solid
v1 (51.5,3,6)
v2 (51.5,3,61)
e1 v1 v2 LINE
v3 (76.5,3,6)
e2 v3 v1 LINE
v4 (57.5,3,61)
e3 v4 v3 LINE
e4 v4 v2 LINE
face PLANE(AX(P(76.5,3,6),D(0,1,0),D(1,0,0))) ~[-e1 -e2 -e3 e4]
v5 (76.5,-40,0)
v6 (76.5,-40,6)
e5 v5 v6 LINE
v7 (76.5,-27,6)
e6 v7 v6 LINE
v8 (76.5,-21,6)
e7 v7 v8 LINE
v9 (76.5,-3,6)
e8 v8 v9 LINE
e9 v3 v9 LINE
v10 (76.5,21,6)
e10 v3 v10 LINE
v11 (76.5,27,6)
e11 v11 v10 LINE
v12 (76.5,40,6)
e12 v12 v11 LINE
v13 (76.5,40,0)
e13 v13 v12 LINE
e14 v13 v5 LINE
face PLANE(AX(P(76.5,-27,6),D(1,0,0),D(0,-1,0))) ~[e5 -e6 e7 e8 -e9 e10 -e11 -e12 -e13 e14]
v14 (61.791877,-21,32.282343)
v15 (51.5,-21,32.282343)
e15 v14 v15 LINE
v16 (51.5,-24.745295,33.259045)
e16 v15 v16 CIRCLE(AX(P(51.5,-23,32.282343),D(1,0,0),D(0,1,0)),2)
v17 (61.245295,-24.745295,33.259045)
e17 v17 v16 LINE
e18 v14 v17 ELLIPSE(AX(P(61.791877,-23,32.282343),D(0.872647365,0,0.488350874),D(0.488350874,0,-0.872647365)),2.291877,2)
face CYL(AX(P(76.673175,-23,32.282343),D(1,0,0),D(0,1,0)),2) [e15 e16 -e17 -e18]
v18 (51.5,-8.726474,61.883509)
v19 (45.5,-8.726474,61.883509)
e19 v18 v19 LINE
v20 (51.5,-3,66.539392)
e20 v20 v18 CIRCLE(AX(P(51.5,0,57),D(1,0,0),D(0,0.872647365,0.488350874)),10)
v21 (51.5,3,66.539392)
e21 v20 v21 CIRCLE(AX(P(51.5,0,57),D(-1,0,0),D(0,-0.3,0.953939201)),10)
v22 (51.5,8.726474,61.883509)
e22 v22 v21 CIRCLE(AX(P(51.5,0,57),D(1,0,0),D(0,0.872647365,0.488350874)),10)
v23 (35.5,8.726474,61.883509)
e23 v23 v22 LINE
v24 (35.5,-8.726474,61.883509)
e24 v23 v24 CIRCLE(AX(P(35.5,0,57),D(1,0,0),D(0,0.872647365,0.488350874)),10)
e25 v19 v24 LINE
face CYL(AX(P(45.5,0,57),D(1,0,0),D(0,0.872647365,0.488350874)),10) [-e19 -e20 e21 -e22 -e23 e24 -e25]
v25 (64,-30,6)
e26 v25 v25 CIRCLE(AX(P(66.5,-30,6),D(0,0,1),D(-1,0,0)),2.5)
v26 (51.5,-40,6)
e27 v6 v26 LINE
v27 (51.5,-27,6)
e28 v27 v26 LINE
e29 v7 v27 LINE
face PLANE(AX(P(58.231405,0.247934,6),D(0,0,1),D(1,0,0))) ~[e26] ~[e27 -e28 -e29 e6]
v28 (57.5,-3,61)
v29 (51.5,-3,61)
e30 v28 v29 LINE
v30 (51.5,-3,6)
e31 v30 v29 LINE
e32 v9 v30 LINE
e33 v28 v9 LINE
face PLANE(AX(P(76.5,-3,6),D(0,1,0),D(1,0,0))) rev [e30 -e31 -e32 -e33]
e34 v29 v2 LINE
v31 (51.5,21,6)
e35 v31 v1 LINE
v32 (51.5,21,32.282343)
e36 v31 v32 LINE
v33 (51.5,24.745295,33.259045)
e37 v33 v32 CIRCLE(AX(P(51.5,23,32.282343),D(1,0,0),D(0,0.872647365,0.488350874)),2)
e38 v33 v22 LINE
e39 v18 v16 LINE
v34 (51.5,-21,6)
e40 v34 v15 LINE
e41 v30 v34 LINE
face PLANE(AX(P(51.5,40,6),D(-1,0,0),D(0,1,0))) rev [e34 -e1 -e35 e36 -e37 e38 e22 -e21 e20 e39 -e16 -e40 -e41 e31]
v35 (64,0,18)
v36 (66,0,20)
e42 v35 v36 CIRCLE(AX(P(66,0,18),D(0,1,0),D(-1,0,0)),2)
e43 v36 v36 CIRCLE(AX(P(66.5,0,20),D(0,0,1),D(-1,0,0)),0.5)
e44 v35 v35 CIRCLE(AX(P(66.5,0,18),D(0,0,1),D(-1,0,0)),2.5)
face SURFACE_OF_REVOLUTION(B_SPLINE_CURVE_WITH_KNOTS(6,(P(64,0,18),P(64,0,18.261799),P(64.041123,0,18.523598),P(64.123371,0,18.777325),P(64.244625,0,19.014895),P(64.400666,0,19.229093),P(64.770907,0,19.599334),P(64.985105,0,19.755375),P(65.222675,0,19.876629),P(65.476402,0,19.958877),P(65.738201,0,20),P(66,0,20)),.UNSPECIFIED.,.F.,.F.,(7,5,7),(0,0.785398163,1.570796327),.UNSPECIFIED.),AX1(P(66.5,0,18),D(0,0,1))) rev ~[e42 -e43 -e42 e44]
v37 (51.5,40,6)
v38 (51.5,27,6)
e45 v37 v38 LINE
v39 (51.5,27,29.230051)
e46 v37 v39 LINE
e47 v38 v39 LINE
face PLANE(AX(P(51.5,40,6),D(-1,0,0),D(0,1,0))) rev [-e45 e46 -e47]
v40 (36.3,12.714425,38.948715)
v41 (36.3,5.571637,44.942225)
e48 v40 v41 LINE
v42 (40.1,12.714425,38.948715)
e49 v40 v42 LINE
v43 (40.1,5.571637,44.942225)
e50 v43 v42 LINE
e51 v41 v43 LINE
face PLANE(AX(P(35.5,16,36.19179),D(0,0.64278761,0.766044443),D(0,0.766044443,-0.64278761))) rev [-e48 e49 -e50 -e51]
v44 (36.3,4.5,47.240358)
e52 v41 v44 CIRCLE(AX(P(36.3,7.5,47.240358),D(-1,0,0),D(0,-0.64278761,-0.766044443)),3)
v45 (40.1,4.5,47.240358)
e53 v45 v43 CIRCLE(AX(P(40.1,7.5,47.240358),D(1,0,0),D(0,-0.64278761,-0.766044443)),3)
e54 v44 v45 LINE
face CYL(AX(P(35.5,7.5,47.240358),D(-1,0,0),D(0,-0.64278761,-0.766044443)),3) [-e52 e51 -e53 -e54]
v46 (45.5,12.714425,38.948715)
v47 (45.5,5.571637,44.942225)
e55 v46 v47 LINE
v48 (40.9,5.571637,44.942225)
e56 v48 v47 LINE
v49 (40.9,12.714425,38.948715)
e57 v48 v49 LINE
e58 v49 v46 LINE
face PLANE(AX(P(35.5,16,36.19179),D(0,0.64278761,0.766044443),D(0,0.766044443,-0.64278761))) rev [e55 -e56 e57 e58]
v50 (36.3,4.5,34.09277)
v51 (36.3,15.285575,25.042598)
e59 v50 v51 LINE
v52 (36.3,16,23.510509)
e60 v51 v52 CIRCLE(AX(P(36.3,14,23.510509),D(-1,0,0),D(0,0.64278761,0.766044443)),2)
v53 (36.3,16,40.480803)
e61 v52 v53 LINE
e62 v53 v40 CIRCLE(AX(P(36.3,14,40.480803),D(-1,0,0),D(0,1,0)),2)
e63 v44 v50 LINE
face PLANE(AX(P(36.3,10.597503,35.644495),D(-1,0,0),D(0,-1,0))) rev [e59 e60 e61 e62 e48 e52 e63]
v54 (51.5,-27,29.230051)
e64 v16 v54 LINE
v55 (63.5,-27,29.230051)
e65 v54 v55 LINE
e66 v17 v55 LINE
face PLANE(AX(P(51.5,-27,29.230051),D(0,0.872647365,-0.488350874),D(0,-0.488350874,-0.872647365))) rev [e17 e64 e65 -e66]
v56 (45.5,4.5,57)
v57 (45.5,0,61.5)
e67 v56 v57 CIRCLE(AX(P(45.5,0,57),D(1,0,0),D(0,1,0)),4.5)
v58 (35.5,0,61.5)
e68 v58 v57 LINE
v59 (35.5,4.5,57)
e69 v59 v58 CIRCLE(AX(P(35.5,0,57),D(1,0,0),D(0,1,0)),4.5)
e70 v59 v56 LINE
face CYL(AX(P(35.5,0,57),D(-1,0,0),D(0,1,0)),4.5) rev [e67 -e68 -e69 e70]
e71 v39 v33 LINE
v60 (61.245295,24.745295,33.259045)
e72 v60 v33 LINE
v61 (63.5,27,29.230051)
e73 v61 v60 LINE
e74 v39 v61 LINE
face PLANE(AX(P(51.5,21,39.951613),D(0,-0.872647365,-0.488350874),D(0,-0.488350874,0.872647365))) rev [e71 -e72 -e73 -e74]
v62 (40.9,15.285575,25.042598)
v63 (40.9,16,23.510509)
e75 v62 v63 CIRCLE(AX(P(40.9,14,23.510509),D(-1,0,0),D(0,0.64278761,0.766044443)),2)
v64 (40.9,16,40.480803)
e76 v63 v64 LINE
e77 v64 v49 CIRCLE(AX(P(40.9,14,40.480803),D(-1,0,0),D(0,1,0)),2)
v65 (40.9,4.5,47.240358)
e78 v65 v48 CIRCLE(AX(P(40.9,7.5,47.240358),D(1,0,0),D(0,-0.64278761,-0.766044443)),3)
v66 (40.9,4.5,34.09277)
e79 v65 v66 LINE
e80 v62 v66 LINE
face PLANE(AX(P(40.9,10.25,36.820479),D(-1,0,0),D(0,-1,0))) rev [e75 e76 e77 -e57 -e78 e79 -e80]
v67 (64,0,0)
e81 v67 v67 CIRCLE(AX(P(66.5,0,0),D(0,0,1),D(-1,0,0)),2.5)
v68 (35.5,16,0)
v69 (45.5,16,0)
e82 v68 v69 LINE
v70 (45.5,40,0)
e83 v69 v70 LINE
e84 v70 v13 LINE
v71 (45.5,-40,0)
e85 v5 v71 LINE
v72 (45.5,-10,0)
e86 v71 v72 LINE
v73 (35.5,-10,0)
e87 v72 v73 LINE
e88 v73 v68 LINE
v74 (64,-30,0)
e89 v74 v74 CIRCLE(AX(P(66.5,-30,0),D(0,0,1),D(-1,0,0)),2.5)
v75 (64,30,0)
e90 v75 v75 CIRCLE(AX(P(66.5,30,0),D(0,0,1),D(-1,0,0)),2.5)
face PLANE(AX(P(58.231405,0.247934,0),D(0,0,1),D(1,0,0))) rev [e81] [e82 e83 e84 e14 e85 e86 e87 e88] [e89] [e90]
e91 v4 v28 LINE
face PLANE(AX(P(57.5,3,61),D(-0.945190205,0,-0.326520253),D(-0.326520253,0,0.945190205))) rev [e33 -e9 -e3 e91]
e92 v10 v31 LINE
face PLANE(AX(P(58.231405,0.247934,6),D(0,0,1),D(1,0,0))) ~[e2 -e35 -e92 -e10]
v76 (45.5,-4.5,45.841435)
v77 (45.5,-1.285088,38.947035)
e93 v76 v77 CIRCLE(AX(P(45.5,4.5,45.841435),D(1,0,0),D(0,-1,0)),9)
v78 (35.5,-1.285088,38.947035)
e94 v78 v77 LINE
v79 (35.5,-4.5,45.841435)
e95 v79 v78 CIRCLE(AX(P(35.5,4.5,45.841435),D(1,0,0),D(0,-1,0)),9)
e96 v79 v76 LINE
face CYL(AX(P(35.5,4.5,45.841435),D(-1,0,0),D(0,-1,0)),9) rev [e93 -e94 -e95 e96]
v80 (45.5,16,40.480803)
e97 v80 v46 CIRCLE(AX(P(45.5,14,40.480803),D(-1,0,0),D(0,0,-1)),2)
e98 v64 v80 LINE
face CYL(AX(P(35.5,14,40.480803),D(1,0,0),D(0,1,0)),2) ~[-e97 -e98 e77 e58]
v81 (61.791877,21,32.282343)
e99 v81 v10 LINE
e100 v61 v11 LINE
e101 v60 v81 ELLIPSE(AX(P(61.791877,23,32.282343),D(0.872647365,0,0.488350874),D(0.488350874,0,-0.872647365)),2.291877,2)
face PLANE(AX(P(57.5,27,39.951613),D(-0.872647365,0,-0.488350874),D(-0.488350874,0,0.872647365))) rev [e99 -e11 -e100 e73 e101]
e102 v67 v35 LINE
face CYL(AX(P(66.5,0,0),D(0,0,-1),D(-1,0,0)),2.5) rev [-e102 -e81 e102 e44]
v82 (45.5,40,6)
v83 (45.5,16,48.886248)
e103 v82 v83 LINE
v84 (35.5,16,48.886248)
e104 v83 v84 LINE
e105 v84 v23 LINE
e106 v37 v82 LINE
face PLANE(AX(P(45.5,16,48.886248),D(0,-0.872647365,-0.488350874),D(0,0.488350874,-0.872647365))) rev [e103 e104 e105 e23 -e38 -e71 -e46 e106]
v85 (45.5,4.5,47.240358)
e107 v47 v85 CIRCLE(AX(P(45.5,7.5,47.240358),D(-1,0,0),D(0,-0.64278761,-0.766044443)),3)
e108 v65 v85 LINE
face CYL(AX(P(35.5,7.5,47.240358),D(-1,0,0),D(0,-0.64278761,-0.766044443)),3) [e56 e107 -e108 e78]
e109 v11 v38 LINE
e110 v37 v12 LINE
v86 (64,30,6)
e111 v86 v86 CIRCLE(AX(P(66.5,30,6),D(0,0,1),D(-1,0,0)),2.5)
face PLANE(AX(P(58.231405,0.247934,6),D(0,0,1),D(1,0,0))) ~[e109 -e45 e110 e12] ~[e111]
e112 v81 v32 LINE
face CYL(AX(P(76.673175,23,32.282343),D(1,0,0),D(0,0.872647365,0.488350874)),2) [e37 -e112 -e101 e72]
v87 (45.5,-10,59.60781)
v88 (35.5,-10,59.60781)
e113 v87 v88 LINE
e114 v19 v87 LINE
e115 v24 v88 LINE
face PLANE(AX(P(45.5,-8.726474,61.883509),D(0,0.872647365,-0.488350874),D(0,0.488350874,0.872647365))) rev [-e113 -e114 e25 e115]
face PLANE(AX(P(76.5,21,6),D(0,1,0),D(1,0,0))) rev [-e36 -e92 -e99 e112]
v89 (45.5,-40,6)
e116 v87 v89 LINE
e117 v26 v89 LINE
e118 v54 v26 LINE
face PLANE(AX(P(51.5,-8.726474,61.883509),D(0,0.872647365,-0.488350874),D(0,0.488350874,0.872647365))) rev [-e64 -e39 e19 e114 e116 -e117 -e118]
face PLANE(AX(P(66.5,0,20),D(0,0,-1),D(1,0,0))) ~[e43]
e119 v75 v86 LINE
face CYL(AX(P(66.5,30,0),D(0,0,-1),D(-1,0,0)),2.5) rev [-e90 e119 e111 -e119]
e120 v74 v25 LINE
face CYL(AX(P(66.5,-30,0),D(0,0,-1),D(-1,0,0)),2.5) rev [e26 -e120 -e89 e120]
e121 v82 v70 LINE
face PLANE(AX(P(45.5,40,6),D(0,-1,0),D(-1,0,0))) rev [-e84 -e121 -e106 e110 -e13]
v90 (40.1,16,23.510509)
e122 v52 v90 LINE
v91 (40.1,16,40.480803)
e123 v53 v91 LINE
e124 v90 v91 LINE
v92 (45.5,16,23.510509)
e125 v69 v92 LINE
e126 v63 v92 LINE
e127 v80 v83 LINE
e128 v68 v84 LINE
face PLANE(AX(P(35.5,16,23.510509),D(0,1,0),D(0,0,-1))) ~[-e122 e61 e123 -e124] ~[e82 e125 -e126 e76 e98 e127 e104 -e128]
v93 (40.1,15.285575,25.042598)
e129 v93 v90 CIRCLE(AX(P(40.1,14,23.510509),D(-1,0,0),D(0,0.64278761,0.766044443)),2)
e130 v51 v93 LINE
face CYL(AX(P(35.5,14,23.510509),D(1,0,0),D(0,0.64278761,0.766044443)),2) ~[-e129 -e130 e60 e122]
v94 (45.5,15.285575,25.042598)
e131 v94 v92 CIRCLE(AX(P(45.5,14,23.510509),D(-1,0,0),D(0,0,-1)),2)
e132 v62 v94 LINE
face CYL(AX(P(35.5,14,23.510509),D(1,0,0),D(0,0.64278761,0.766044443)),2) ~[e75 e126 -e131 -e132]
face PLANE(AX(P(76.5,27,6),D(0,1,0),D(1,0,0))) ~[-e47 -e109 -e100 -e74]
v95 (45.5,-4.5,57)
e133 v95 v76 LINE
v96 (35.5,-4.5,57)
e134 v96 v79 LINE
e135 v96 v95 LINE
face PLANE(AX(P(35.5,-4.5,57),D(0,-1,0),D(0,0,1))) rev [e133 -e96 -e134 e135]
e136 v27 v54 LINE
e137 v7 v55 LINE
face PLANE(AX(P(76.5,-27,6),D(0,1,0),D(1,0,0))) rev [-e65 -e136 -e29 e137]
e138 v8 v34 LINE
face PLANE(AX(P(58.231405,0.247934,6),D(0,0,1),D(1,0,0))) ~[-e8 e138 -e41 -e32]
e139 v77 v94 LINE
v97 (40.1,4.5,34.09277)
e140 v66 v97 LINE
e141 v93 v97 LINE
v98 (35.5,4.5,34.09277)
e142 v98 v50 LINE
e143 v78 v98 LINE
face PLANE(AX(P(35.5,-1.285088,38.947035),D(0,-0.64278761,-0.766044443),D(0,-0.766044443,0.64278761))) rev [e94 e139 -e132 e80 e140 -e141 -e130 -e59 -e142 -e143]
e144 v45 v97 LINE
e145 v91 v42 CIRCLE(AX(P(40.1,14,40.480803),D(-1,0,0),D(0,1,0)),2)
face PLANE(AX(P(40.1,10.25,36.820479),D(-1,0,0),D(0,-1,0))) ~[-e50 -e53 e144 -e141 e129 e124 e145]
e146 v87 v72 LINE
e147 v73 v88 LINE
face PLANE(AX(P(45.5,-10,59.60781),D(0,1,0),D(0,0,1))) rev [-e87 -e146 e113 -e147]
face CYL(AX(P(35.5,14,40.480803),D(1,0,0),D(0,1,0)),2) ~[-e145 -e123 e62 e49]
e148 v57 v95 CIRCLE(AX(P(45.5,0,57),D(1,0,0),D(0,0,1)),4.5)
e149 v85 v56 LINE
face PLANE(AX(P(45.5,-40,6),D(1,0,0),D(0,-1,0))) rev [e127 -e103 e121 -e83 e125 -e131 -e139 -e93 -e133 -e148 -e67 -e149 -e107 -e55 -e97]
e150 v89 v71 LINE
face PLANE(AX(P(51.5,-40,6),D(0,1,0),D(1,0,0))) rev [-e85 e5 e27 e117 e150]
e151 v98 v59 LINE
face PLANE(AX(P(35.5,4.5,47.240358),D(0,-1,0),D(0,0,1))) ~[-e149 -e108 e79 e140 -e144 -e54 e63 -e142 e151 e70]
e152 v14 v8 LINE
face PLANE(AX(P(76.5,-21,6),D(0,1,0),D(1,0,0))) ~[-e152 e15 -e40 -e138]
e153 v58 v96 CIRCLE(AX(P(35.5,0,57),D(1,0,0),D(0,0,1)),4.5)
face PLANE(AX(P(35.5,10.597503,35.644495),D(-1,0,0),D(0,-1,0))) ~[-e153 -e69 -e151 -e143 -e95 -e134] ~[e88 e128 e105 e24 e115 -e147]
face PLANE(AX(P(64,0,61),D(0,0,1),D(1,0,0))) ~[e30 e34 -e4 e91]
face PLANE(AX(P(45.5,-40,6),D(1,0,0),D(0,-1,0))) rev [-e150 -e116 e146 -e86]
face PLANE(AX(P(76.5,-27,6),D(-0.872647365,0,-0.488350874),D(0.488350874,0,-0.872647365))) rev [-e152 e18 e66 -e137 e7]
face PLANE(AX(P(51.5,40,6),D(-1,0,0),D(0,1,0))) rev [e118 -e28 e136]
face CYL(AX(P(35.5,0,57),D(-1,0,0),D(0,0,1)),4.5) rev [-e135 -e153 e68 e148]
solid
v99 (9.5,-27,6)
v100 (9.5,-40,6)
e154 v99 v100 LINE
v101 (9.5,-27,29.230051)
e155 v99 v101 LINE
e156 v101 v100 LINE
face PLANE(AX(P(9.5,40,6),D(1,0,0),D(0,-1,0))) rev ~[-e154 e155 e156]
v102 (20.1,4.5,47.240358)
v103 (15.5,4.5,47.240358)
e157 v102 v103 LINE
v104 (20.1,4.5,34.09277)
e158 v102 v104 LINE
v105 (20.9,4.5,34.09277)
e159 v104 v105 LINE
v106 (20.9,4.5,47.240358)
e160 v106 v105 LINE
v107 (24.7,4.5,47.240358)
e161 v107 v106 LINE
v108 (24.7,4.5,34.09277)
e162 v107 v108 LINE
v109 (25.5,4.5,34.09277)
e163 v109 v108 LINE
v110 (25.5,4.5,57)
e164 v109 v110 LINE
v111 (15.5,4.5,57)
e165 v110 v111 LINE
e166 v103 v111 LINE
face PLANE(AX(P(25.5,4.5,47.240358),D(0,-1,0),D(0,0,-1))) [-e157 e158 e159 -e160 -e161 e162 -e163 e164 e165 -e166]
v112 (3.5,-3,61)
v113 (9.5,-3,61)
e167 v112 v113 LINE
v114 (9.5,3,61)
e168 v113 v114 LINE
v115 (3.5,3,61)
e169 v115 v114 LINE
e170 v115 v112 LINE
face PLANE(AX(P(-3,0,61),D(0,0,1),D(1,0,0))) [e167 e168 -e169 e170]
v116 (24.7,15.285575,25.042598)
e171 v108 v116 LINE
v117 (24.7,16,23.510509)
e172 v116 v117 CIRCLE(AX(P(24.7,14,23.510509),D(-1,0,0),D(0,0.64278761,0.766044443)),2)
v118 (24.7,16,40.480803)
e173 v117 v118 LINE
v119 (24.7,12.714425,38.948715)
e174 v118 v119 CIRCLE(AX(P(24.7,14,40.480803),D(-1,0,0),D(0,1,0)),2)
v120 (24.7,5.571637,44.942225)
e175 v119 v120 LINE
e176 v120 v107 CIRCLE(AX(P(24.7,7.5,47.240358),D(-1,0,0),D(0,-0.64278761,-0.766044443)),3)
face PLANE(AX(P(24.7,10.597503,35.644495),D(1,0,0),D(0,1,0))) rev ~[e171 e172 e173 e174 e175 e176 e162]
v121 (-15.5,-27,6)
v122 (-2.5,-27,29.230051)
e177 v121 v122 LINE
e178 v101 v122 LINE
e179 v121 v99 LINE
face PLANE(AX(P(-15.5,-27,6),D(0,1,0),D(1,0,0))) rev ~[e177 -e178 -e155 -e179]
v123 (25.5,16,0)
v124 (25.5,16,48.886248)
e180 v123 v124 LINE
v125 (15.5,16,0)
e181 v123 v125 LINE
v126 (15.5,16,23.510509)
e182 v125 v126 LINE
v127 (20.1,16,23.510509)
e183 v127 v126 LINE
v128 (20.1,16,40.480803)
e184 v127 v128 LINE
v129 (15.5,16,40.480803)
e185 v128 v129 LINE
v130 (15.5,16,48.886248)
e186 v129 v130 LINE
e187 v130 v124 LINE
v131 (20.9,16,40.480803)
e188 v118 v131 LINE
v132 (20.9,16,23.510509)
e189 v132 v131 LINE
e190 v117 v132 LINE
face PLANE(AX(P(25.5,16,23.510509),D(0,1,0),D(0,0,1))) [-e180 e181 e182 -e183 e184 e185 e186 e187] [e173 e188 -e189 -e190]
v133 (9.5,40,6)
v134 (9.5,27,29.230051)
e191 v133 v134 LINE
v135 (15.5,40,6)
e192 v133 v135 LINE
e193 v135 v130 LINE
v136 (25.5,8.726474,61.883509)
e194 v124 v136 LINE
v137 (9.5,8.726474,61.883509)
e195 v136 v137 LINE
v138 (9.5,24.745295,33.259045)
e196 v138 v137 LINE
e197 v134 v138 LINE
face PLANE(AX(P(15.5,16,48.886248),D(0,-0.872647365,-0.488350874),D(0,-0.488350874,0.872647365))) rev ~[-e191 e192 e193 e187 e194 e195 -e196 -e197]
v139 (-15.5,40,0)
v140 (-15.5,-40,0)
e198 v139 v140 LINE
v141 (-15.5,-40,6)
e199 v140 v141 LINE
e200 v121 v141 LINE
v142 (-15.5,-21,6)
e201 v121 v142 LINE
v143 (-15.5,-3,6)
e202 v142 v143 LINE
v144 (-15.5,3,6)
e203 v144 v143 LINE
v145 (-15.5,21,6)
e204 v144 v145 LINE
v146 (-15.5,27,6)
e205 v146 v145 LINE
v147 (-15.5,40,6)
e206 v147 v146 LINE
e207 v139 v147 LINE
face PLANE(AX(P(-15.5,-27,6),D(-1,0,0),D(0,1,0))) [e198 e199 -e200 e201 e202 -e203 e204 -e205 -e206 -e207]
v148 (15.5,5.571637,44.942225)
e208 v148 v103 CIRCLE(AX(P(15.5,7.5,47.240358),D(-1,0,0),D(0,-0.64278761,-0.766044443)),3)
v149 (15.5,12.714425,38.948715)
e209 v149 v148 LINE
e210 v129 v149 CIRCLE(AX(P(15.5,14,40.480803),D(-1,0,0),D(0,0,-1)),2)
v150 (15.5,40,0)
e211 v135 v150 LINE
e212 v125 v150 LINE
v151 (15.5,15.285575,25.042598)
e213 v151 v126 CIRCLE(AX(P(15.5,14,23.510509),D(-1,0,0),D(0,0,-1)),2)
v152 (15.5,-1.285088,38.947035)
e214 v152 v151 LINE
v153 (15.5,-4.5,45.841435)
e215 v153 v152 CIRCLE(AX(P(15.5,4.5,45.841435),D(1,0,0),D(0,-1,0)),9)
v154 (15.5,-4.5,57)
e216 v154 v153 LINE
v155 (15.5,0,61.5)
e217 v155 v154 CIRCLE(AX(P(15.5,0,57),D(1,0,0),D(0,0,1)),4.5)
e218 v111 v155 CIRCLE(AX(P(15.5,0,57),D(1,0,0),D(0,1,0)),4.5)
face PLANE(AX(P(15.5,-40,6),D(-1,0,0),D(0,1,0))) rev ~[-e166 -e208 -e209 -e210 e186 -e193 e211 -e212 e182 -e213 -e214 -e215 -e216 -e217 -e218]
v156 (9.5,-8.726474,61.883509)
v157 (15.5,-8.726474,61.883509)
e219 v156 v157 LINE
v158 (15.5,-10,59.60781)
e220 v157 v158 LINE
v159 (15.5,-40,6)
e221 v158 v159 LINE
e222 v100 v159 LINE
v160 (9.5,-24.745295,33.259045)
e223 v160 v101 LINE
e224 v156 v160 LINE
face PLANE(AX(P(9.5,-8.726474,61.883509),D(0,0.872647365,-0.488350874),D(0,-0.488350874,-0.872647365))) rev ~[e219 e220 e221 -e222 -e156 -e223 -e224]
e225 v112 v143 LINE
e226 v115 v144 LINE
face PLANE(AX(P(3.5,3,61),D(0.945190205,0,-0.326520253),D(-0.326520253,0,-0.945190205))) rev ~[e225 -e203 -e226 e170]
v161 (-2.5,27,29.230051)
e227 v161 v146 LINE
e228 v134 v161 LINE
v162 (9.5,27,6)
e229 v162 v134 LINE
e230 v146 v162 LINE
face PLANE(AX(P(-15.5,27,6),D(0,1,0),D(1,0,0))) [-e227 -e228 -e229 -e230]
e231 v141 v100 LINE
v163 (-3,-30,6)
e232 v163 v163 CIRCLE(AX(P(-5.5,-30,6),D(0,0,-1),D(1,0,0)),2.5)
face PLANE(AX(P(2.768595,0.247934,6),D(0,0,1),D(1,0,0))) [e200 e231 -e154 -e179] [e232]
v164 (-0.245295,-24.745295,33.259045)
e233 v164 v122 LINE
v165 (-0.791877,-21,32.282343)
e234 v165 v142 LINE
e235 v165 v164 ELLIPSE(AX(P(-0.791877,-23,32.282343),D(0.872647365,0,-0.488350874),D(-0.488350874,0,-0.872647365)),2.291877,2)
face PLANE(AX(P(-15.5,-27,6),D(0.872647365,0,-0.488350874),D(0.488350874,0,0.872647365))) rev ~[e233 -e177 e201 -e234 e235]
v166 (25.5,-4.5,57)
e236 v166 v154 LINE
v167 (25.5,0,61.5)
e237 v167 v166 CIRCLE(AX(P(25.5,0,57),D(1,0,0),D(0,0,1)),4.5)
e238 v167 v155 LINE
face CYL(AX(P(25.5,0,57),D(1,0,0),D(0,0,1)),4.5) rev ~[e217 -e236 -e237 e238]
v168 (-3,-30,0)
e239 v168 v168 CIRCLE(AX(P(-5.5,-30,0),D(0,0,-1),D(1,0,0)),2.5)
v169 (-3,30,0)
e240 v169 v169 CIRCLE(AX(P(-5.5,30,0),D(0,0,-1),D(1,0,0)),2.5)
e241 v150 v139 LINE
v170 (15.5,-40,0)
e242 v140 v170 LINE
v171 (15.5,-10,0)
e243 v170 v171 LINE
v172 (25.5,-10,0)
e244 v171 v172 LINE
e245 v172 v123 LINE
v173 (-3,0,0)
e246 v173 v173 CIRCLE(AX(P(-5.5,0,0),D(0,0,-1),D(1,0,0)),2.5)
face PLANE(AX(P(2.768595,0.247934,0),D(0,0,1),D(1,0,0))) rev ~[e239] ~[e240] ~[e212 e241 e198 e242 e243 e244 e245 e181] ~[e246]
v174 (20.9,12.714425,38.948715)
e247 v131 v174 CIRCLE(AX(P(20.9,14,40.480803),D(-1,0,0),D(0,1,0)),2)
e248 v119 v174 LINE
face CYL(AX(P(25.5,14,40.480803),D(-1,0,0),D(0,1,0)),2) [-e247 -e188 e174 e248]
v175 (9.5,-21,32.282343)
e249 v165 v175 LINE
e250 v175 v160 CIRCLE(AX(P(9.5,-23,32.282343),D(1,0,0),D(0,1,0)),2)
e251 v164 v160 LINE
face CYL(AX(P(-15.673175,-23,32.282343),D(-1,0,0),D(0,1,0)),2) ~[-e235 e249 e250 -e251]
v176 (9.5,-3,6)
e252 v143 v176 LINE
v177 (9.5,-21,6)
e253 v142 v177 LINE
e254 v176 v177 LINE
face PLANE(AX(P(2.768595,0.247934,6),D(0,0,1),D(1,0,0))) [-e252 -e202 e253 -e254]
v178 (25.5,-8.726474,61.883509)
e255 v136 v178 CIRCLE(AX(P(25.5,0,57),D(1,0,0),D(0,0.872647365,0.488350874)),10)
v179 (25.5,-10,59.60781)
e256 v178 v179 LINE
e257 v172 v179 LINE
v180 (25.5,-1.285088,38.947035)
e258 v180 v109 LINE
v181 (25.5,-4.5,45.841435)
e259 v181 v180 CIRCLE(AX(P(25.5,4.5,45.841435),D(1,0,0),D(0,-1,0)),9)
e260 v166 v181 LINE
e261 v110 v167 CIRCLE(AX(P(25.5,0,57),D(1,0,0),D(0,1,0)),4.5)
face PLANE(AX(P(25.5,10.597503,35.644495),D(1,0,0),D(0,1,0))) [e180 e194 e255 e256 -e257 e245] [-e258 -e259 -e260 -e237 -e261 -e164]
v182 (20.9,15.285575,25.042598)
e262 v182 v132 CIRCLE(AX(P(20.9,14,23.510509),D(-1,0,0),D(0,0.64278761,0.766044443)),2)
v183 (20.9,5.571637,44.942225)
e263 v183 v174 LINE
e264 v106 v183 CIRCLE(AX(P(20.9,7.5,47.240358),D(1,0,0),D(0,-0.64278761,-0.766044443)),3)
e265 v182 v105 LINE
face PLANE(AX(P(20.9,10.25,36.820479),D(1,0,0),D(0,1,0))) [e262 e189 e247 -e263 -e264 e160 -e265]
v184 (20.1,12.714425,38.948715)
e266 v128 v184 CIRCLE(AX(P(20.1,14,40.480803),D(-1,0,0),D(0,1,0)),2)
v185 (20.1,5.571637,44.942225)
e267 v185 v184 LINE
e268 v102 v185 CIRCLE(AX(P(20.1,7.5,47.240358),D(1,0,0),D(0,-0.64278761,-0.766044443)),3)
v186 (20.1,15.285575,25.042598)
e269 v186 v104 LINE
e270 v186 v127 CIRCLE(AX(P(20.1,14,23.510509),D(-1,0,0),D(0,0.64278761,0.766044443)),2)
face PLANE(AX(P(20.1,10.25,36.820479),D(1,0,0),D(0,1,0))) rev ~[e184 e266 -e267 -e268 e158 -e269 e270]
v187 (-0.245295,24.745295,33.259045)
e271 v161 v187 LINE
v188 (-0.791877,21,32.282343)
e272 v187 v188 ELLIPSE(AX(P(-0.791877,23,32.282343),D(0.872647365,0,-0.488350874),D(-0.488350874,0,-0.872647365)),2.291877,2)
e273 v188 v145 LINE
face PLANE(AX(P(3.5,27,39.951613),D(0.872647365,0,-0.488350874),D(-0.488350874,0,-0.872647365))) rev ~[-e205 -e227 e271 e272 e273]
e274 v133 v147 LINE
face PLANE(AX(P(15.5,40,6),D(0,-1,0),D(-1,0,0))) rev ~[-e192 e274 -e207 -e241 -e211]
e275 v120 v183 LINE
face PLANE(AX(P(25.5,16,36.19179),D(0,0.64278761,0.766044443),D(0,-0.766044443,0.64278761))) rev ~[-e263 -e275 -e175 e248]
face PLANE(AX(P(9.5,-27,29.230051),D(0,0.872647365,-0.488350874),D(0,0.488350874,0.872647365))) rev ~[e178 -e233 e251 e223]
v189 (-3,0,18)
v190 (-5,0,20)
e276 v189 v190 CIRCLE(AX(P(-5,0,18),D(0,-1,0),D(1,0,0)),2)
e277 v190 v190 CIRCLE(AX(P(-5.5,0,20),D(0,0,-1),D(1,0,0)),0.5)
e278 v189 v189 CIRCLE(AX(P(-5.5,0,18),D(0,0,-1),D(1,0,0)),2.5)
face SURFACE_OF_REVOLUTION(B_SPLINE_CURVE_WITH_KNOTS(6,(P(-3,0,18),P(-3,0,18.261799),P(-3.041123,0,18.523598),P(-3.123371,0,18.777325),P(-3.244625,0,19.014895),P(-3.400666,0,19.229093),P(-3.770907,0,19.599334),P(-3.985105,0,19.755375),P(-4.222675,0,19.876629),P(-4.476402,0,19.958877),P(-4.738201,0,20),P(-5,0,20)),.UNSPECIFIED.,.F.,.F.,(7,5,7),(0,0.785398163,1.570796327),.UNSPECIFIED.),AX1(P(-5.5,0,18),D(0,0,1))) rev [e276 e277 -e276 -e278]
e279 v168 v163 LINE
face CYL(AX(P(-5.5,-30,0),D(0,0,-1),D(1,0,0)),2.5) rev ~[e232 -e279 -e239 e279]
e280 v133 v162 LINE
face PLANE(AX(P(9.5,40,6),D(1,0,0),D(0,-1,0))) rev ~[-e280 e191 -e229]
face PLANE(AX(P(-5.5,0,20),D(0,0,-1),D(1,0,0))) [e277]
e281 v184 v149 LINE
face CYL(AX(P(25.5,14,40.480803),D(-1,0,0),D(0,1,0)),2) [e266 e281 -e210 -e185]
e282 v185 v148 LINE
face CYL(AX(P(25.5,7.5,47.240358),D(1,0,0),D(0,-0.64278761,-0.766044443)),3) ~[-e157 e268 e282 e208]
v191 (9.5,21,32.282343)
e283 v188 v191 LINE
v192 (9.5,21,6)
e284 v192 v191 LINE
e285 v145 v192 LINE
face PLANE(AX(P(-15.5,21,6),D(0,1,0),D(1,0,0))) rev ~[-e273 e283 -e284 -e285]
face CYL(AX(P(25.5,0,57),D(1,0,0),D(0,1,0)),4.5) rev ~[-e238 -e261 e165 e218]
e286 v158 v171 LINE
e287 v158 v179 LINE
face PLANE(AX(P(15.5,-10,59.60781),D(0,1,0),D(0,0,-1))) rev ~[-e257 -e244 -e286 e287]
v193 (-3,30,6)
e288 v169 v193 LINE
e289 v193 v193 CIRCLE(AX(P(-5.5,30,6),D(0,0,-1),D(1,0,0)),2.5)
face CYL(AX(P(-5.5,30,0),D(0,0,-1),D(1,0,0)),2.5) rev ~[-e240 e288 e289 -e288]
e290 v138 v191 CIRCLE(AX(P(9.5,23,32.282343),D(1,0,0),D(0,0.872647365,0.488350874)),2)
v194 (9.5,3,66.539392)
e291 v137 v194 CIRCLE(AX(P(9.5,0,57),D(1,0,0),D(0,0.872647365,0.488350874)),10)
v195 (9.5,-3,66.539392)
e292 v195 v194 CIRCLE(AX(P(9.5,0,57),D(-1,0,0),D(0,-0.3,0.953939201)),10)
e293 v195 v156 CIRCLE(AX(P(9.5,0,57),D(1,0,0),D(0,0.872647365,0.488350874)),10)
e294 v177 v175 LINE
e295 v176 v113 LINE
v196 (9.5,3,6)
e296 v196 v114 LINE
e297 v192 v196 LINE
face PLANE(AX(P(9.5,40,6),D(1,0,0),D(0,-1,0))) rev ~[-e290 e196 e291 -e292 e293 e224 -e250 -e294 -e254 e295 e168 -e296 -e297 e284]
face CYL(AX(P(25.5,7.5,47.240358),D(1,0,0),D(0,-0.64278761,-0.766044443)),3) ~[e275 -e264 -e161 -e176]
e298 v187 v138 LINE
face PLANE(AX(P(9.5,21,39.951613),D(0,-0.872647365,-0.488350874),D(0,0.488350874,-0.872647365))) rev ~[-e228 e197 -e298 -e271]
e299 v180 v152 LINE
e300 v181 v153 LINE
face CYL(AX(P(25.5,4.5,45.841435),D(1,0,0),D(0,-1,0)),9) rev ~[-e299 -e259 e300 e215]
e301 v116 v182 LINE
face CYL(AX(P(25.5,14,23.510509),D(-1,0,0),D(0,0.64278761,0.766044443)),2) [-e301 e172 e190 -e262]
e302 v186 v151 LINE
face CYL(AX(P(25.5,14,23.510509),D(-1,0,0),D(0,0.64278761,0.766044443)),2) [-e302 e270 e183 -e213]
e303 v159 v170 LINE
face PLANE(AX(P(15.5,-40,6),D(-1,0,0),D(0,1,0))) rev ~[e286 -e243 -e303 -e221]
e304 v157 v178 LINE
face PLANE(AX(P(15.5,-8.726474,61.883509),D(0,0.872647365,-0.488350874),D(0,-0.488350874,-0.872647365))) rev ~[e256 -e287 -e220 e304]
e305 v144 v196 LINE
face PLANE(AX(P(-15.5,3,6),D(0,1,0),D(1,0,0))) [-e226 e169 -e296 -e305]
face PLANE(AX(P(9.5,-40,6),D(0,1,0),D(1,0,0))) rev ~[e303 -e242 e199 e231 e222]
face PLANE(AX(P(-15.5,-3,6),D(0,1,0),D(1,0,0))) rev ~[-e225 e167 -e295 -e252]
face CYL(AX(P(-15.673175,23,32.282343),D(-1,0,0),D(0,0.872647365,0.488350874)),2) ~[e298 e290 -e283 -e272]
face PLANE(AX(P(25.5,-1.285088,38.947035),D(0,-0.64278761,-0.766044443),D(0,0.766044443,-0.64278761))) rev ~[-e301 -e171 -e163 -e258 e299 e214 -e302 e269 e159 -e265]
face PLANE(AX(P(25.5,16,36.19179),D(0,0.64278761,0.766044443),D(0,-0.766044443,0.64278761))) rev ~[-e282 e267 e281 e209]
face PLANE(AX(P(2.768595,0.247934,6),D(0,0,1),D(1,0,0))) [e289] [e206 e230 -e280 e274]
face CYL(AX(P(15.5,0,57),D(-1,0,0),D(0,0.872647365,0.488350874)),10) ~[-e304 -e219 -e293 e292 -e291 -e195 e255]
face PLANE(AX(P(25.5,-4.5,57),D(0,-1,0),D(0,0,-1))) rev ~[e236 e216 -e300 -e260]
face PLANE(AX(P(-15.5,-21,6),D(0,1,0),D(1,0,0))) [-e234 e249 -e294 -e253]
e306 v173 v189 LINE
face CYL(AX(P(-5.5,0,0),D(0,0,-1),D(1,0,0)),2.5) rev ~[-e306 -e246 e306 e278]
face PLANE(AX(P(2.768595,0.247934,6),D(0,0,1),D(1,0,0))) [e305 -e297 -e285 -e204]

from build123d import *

# Parameters (mm, degrees)
F1_DEPTH       = 6
F3_DEPTH       = 61
F5_DEPTH       = 25
F6_W           = 25
F6_H           = 6
F7_DEPTH       = 55
F9_DEPTH       = 66
F11_DEPTH      = 10
F13_DEPTH      = 10
F14_R          = 2
F17_DEPTH      = 0.4
F17_DEPTH_BACK = 0.4
F19_DEPTH      = 0.8
F20_R          = 2.5
F21_DEPTH      = 20
F22_R          = 2
F24_DEPTH      = 14.1
F26_DEPTH      = 9.9
F28_DEPTH      = 6.1
F29_T1_DEPTH   = 25.1731750977


# Not quite as in the source:
# - a fillet or chamfer that OpenCascade refuses, or shapes differently, is made with other operations: its cross-section is extruded or revolved along the edge and cut away or added


with BuildPart() as f1:
    # F0 (on Top) → F1 (new body)
    with BuildSketch(Plane.XY):
        Polygon((15.5, 40), (-15.5, 40), (-15.5, -40), (15.5, -40), (15.5, -10), (25.5, -10), (25.5, 16), (15.5, 16), align=None)
    extrude(amount=F1_DEPTH)

    # F2 (on face) → F3 (join)
    with BuildSketch(Plane.XY.offset(6)):
        Polygon((15.5, 16), (15.5, 40), (9.5, 40), (9.5, -40), (15.5, -40), (15.5, -10), align=None)
    extrude(amount=F3_DEPTH)

    # F4 (on face) → F5 (cut)
    with BuildSketch(Plane(origin=(9.5, 0, 0), x_dir=(0, -1, 0), z_dir=(-1, 0, 0))):
        with BuildLine():
            ThreePointArc((-8.7264736489, 61.8835087442), (0, 67), (8.7264736489, 61.8835087442))
            Line((8.7264736489, 61.8835087442), (40, 6))
            Line((40, 6), (42.4536168575, 71.3308081031))
            Line((42.4536168575, 71.3308081031), (-55.2879087627, 71.3308081031))
            Line((-55.2879087627, 71.3308081031), (-55.2879087627, 6))
            Line((-55.2879087627, 6), (-40, 6))
            Line((-40, 6), (-8.7264736489, 61.8835087442))
        make_face()
    extrude(amount=-F5_DEPTH, mode=Mode.SUBTRACT)

    # F6 (on face) → F7 (join)
    with BuildSketch(Plane.XY.offset(6)):
        with Locations((-3, 0)):
            Rectangle(F6_W, F6_H)
        with Locations((-3, -24)):
            Rectangle(F6_W, F6_H)
        with Locations((-3, 24)):
            Rectangle(F6_W, F6_H)
    extrude(amount=F7_DEPTH)

    # F8 (on face) → F9 (cut)
    with BuildSketch(Plane.YZ.offset(9.5)):
        with BuildLine():
            Line((-71.4004188776, 87.6169577241), (-40, 6))
            Line((-40, 6), (-27, 29.2300510508))
            Line((-27, 29.2300510508), (-21, 39.9516130743))
            Line((-21, 39.9516130743), (-8.7264736489, 61.8835087442))
            ThreePointArc((-8.7264736489, 61.8835087442), (-6.3084751181, 64.7590683516), (-3, 66.5393920142))
            ThreePointArc((-3, 66.5393920142), (0, 67), (3, 66.5393920142))
            ThreePointArc((3, 66.5393920142), (6.3084751181, 64.7590683516), (8.7264736489, 61.8835087442))
            Line((8.7264736489, 61.8835087442), (21, 39.9516130743))
            Line((21, 39.9516130743), (27, 29.2300510508))
            Line((27, 29.2300510508), (40, 6))
            Line((40, 6), (67.9079666734, 87.6169577241))
            Line((67.9079666734, 87.6169577241), (-71.4004188776, 87.6169577241))
        make_face()
    extrude(amount=-F9_DEPTH, mode=Mode.SUBTRACT)

    # F10 (on face) → F11 (join, through all)
    with BuildSketch(Plane.YZ.offset(15.5)):
        with BuildLine():
            Line((-10, 59.6078101173), (-10, 6))
            Line((-10, 6), (16, 6))
            Line((16, 6), (16, 48.8862480938))
            Line((16, 48.8862480938), (8.7264736489, 61.8835087442))
            ThreePointArc((8.7264736489, 61.8835087442), (0, 67), (-8.7264736489, 61.8835087442))
            Line((-8.7264736489, 61.8835087442), (-10, 59.6078101173))
        make_face()
    extrude(amount=F11_DEPTH)

    # F12 (on face) → F13 (cut, through all)
    with BuildSketch(Plane.YZ.offset(25.5)):
        with BuildLine():
            ThreePointArc((0, 61.5), (-3.1819805153, 60.1819805153), (-4.5, 57))
            Line((-4.5, 57), (-4.5, 45.8414354094))
            ThreePointArc((-4.5, 45.8414354094), (-3.6567700833, 42.0378710538), (-1.2850884872, 38.9470354214))
            Line((-1.2850884872, 38.9470354214), (16, 24.4431240469))
            Line((16, 24.4431240469), (16, 36.1917896509))
            Line((16, 36.1917896509), (5.5716371709, 44.9422250545))
            ThreePointArc((5.5716371709, 44.9422250545), (4.7810766389, 45.9725035987), (4.5, 47.2403583839))
            Line((4.5, 47.2403583839), (4.5, 57))
            ThreePointArc((4.5, 57), (3.1819805153, 60.1819805153), (0, 61.5))
        make_face()
    extrude(amount=-F13_DEPTH, mode=Mode.SUBTRACT)

    # F14
    f14_edges = [f1.edges().sort_by_distance(p)[0] for p in [
        (20.5, 16, 36.19179),
        (20.5, 16, 24.443124),
    ]]
    fillet(f14_edges, radius=F14_R)

    # F16 (on offset) → F17 (join, two sides)
    with BuildSketch(Plane.YZ.offset(20.5)) as f17_sk:
        Polygon((16, 40.4808034919), (4.5, 50.1304492505), (4.5, 33.1601544891), (16, 23.5105087306), align=None)
    extrude(amount=F17_DEPTH)
    extrude(f17_sk.sketch, amount=-F17_DEPTH_BACK)

    # F18 (on face) → F19 (join)
    with BuildSketch(Plane.YZ.offset(25.5)):
        with BuildLine():
            ThreePointArc((16, 40.4808034919), (14.8452365235, 38.6681879179), (12.7144247806, 38.9487146057))
            Line((12.7144247806, 38.9487146057), (5.5716371709, 44.9422250545))
            ThreePointArc((5.5716371709, 44.9422250545), (4.7810766389, 45.9725035987), (4.5, 47.2403583839))
            Line((4.5, 47.2403583839), (4.5, 34.0927698054))
            Line((4.5, 34.0927698054), (15.2855752194, 25.0425976168))
            ThreePointArc((15.2855752194, 25.0425976168), (15.8126155741, 24.3557452541), (16, 23.5105087306))
            Line((16, 23.5105087306), (16, 40.4808034919))
        make_face()
    extrude(amount=-F19_DEPTH)

    # F20 (on face) → F21 (cut)
    with BuildSketch(Plane(origin=(0, 0, 0), x_dir=(1, 0, 0), z_dir=(0, 0, -1))):
        with Locations((-5.5, 0)):
            Circle(F20_R)
        with Locations((-5.5, 30)):
            Circle(F20_R)
        with Locations((-5.5, -30)):
            Circle(F20_R)
    extrude(amount=-F21_DEPTH, mode=Mode.SUBTRACT)

    # F22
    f22_edges = [f1.edges().sort_by_distance(p)[0] for p in [
        (-8, 0, 20),
    ]]
    fillet(f22_edges, radius=F22_R)

    # F23 (on face) → F24 (cut)
    with BuildSketch(Plane.XZ.offset(27)):
        Polygon((3.5, 39.9516130743), (9.5, 39.9516130743), (9.5, 46.4005209506), (-37.9068218172, 46.4005209506), (-37.9068218172, 6), (-15.5, 6), align=None)
    extrude(amount=-F24_DEPTH, mode=Mode.SUBTRACT)

    # F25 (on face) → F26 (cut)
    with BuildSketch(Plane(origin=(0, 27, 0), x_dir=(-1, 0, 0), z_dir=(0, 1, 0))):
        Polygon((-9.5, 49.5710298419), (-9.5, 39.9516130743), (-3.5, 39.9516130743), (15.5, 6), (21.0043340921, 6), (21.0043340921, 49.5710298419), align=None)
    extrude(amount=-F26_DEPTH, mode=Mode.SUBTRACT)

    # F27 (on face) → F28 (cut)
    with BuildSketch(Plane(origin=(0, 3, 0), x_dir=(-1, 0, 0), z_dir=(0, 1, 0))):
        Polygon((-9.5, 63.8725236058), (-9.5, 61), (-3.5, 61), (15.5, 6), (33.5027240217, 48.3329854906), (22.2862139344, 65.7419413328), align=None)
    extrude(amount=-F28_DEPTH, mode=Mode.SUBTRACT)

    # F29: fillet of radius 2 on 2 edges, made by hand

    # F29_s2 → F29_t1 (cut)
    with BuildSketch(Plane.YZ.offset(-15.6731750977)):
        with BuildLine():
            ThreePointArc((24.7452947298, 33.259044784), (22.4953166634, 34.2176194314), (21, 32.2823430352))
            Line((21, 32.2823430352), (21, 39.9516130743))
            Line((21, 39.9516130743), (24.7452947298, 33.259044784))
        make_face()
        with BuildLine():
            ThreePointArc((-21, 32.2823430352), (-22.4953166634, 34.2176194314), (-24.7452947298, 33.259044784))
            Line((-24.7452947298, 33.259044784), (-21, 39.9516130743))
            Line((-21, 39.9516130743), (-21, 32.2823430352))
        make_face()
    extrude(amount=F29_T1_DEPTH, mode=Mode.SUBTRACT)


with BuildPart() as f31_1:
    # F31: instance of F1
    add(f1.part.mirror(Plane(origin=(30.5, 2.9102814818, 28.9120815195), x_dir=(0, 1, 0), z_dir=(1, 0, 0))))


solid = Compound([f1.part, f31_1.part])
